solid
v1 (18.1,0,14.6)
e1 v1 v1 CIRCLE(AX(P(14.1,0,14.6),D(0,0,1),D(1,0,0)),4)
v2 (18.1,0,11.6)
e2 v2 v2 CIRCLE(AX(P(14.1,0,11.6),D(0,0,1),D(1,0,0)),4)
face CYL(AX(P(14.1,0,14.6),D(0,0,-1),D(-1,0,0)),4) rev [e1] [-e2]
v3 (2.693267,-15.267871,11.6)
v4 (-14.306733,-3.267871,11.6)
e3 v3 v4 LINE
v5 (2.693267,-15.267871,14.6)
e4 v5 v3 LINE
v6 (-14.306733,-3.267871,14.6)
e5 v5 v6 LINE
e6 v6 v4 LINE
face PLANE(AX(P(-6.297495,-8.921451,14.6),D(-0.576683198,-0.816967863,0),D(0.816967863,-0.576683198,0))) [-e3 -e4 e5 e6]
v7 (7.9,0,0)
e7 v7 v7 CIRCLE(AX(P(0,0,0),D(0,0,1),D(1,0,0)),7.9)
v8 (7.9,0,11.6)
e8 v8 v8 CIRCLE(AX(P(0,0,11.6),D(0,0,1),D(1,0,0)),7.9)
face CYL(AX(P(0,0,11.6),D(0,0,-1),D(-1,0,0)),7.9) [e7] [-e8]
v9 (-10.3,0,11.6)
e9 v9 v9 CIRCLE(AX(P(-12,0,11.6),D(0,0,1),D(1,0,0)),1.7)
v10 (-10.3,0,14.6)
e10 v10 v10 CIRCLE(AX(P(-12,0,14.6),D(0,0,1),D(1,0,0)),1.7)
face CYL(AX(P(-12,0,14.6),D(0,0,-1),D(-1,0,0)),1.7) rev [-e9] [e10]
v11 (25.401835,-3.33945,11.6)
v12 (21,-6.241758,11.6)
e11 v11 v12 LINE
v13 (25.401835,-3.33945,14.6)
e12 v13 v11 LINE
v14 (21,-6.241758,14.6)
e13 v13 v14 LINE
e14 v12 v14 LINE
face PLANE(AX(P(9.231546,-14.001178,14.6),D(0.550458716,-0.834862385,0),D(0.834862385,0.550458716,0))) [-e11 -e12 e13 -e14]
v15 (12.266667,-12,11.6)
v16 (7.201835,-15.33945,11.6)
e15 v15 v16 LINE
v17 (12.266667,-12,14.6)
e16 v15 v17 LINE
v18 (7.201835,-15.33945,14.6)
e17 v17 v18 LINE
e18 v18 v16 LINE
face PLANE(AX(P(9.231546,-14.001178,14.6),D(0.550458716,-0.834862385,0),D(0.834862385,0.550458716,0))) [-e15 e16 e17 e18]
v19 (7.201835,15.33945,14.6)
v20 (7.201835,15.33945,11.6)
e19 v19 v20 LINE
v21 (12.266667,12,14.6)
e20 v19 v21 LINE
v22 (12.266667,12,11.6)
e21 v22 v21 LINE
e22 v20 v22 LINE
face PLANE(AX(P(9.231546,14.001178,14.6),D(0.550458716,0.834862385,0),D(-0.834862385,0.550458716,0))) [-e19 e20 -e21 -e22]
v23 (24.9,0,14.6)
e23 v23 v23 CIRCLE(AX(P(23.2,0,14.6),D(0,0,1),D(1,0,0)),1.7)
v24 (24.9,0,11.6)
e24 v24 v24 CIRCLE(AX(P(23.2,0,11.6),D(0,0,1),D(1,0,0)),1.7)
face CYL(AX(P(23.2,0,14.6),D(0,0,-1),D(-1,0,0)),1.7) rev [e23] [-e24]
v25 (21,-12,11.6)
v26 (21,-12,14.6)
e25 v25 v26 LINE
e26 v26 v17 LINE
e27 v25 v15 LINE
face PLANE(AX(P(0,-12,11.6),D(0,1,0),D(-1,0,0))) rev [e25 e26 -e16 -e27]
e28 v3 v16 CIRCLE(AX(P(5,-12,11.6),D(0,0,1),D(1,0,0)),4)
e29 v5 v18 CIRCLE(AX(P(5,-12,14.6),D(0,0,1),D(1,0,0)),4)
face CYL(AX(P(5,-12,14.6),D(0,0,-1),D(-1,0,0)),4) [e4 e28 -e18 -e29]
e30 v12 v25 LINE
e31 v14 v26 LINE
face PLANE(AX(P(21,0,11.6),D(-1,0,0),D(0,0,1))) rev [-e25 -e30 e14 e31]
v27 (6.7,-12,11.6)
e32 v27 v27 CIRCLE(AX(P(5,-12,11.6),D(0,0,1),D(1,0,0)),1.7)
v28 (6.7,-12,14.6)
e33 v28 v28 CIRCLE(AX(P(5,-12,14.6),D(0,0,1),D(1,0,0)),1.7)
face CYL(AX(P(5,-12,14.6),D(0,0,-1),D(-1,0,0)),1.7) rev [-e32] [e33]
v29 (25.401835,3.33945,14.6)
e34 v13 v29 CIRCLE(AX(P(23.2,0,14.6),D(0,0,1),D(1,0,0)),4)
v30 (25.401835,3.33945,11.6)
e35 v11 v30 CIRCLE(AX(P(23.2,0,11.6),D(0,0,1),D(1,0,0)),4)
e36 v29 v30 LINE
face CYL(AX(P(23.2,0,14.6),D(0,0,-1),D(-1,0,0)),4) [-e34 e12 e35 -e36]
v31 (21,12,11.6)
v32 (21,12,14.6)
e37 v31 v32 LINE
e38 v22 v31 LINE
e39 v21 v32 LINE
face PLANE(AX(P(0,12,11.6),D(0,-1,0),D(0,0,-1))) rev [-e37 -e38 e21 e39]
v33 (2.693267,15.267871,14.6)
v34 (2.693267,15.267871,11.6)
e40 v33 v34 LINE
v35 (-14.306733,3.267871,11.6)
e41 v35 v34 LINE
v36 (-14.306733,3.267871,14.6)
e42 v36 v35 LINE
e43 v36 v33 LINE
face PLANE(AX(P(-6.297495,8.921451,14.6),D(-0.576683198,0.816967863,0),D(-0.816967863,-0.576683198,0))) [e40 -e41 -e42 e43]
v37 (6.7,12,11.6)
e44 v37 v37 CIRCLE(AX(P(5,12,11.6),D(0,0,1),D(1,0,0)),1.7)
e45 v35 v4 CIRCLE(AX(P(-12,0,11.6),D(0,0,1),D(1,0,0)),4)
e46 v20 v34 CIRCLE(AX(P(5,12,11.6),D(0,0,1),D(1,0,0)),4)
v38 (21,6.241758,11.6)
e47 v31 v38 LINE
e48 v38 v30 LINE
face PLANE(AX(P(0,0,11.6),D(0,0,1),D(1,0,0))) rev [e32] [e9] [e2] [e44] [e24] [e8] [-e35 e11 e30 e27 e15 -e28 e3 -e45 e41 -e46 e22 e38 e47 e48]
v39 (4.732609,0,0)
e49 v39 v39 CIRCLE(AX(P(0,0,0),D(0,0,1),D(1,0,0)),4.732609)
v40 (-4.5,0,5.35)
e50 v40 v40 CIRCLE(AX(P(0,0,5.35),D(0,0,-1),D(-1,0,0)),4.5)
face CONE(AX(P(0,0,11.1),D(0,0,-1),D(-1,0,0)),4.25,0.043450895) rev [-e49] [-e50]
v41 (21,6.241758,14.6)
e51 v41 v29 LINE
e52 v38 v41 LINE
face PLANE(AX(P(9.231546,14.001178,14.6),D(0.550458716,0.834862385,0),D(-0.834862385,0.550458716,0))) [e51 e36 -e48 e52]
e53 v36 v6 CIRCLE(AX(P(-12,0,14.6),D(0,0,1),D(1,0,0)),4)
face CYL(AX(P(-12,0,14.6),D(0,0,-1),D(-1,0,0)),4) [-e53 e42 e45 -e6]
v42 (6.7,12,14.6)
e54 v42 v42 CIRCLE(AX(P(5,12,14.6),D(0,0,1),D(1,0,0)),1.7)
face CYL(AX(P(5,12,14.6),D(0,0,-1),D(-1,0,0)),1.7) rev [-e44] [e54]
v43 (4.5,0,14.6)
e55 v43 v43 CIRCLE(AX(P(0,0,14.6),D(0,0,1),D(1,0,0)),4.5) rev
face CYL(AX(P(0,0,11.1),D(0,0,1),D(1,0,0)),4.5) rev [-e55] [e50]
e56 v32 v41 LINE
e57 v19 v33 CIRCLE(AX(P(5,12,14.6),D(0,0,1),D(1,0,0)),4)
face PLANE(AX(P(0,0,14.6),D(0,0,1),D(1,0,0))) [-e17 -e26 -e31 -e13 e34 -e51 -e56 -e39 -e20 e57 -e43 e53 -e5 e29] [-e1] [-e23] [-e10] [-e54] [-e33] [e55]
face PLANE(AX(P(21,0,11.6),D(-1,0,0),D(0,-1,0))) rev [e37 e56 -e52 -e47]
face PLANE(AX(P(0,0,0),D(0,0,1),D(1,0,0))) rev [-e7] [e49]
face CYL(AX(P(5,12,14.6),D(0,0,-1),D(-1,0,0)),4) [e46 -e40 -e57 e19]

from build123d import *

# Parameters (mm, degrees)
SZKIC1_R                    = 7.9
SZKIC1_R_2                  = 4.75
DODANIE_WYCI_GNI_CIE1_DEPTH = 11.6
DODANIE_WYCI_GNI_CIE2_START = -0.5
SZKIC2_R                    = 4.75
SZKIC2_R_2                  = 4.5
DODANIE_WYCI_GNI_CIE2_DEPTH = 0.5
SFAZOWANIE1_SIZE            = 11.5
SFAZOWANIE1_SIZE_2          = 0.5
SZKIC4_R                    = 4
SZKIC4_R_2                  = 1.7
SZKIC4_R_3                  = 4.5
DODANIE_WYCI_GNI_CIE4_DEPTH = 3
DODANIE_WYCI_GNI_CIE5_DEPTH = 3


with BuildPart() as part:
    # Szkic1 → Dodanie-wyciągnięcie1 (new body)
    with BuildSketch(Plane.XY):
        Circle(SZKIC1_R)
        Circle(SZKIC1_R_2, mode=Mode.SUBTRACT)
    extrude(amount=DODANIE_WYCI_GNI_CIE1_DEPTH)

    # Szkic2 → Dodanie-wyciągnięcie2 (add)
    with BuildSketch(Plane.XY.offset(11.6).offset(DODANIE_WYCI_GNI_CIE2_START)):
        Circle(SZKIC2_R)
        Circle(SZKIC2_R_2, mode=Mode.SUBTRACT)
    extrude(amount=DODANIE_WYCI_GNI_CIE2_DEPTH)

    # Sfazowanie1
    # the kernel refuses this chamfer: 11.5, 0.5 mm, written as the material it adds along each edge
    with BuildSketch(Plane(origin=(0, 0, 11.1), x_dir=(1, 0, 0), z_dir=(0, -1, 0))) as sfazowanie1_piece_1_section:
        Polygon((4.75, -SFAZOWANIE1_SIZE), (4.75 - SFAZOWANIE1_SIZE_2, 0), (4.75, 0), align=None)
    sfazowanie1_piece_1 = revolve(axis=Axis((0, 0, 11.1), (0, 0, 1)), mode=Mode.PRIVATE)
    sfazowanie1_piece_1 = split(sfazowanie1_piece_1, bisect_by=Plane(origin=(-4.668659179, 0, 0), z_dir=(0, 0, 1)), keep=Keep.TOP, mode=Mode.PRIVATE)
    sfazowanie1_piece_1 = sfazowanie1_piece_1 - Plane(origin=(0, 0, 2.677276297), x_dir=(1, 0, 0), z_dir=(0, 0, -1)) * Cylinder(4.5, 46, mode=Mode.PRIVATE)
    add(sfazowanie1_piece_1)

    # Szkic4 → Dodanie-wyciągnięcie4 (add)
    with BuildSketch(Plane.XY.offset(11.6)):
        with BuildLine():
            Line((2.69326721, 15.267871453), (-14.30673279, 3.267871453))
            ThreePointArc((-14.30673279, 3.267871453), (-16, 0), (-14.30673279, -3.267871453))
            Line((-14.30673279, -3.267871453), (2.69326721, -15.267871453))
            ThreePointArc((2.69326721, -15.267871453), (4.936503941, -15.999496), (7.201834862, -15.339449541))
            Line((7.201834862, -15.339449541), (25.401834862, -3.339449541))
            ThreePointArc((25.401834862, -3.339449541), (27.2, 0), (25.401834862, 3.339449541))
            Line((25.401834862, 3.339449541), (7.201834862, 15.339449541))
            ThreePointArc((7.201834862, 15.339449541), (4.936503941, 15.999496), (2.69326721, 15.267871453))
        make_face()
        with Locations((14.1, 0)):
            Circle(SZKIC4_R, mode=Mode.SUBTRACT)
        with Locations((-12, 0)):
            Circle(SZKIC4_R_2, mode=Mode.SUBTRACT)
        with Locations((5, 12)):
            Circle(SZKIC4_R_2, mode=Mode.SUBTRACT)
        with Locations((5, -12)):
            Circle(SZKIC4_R_2, mode=Mode.SUBTRACT)
        with Locations((23.2, 0)):
            Circle(SZKIC4_R_2, mode=Mode.SUBTRACT)
        Circle(SZKIC4_R_3, mode=Mode.SUBTRACT)
    extrude(amount=DODANIE_WYCI_GNI_CIE4_DEPTH)

    # Szkic5 → Dodanie-wyciągnięcie5 (add)
    with BuildSketch(Plane.XY.offset(14.6)):
        Polygon((21, -12), (21, -6.241758242), (12.266666667, -12), align=None)
        Polygon((21, 12), (12.266666667, 12), (21, 6.241758242), align=None)
    extrude(amount=-DODANIE_WYCI_GNI_CIE5_DEPTH)


solid = part.part
